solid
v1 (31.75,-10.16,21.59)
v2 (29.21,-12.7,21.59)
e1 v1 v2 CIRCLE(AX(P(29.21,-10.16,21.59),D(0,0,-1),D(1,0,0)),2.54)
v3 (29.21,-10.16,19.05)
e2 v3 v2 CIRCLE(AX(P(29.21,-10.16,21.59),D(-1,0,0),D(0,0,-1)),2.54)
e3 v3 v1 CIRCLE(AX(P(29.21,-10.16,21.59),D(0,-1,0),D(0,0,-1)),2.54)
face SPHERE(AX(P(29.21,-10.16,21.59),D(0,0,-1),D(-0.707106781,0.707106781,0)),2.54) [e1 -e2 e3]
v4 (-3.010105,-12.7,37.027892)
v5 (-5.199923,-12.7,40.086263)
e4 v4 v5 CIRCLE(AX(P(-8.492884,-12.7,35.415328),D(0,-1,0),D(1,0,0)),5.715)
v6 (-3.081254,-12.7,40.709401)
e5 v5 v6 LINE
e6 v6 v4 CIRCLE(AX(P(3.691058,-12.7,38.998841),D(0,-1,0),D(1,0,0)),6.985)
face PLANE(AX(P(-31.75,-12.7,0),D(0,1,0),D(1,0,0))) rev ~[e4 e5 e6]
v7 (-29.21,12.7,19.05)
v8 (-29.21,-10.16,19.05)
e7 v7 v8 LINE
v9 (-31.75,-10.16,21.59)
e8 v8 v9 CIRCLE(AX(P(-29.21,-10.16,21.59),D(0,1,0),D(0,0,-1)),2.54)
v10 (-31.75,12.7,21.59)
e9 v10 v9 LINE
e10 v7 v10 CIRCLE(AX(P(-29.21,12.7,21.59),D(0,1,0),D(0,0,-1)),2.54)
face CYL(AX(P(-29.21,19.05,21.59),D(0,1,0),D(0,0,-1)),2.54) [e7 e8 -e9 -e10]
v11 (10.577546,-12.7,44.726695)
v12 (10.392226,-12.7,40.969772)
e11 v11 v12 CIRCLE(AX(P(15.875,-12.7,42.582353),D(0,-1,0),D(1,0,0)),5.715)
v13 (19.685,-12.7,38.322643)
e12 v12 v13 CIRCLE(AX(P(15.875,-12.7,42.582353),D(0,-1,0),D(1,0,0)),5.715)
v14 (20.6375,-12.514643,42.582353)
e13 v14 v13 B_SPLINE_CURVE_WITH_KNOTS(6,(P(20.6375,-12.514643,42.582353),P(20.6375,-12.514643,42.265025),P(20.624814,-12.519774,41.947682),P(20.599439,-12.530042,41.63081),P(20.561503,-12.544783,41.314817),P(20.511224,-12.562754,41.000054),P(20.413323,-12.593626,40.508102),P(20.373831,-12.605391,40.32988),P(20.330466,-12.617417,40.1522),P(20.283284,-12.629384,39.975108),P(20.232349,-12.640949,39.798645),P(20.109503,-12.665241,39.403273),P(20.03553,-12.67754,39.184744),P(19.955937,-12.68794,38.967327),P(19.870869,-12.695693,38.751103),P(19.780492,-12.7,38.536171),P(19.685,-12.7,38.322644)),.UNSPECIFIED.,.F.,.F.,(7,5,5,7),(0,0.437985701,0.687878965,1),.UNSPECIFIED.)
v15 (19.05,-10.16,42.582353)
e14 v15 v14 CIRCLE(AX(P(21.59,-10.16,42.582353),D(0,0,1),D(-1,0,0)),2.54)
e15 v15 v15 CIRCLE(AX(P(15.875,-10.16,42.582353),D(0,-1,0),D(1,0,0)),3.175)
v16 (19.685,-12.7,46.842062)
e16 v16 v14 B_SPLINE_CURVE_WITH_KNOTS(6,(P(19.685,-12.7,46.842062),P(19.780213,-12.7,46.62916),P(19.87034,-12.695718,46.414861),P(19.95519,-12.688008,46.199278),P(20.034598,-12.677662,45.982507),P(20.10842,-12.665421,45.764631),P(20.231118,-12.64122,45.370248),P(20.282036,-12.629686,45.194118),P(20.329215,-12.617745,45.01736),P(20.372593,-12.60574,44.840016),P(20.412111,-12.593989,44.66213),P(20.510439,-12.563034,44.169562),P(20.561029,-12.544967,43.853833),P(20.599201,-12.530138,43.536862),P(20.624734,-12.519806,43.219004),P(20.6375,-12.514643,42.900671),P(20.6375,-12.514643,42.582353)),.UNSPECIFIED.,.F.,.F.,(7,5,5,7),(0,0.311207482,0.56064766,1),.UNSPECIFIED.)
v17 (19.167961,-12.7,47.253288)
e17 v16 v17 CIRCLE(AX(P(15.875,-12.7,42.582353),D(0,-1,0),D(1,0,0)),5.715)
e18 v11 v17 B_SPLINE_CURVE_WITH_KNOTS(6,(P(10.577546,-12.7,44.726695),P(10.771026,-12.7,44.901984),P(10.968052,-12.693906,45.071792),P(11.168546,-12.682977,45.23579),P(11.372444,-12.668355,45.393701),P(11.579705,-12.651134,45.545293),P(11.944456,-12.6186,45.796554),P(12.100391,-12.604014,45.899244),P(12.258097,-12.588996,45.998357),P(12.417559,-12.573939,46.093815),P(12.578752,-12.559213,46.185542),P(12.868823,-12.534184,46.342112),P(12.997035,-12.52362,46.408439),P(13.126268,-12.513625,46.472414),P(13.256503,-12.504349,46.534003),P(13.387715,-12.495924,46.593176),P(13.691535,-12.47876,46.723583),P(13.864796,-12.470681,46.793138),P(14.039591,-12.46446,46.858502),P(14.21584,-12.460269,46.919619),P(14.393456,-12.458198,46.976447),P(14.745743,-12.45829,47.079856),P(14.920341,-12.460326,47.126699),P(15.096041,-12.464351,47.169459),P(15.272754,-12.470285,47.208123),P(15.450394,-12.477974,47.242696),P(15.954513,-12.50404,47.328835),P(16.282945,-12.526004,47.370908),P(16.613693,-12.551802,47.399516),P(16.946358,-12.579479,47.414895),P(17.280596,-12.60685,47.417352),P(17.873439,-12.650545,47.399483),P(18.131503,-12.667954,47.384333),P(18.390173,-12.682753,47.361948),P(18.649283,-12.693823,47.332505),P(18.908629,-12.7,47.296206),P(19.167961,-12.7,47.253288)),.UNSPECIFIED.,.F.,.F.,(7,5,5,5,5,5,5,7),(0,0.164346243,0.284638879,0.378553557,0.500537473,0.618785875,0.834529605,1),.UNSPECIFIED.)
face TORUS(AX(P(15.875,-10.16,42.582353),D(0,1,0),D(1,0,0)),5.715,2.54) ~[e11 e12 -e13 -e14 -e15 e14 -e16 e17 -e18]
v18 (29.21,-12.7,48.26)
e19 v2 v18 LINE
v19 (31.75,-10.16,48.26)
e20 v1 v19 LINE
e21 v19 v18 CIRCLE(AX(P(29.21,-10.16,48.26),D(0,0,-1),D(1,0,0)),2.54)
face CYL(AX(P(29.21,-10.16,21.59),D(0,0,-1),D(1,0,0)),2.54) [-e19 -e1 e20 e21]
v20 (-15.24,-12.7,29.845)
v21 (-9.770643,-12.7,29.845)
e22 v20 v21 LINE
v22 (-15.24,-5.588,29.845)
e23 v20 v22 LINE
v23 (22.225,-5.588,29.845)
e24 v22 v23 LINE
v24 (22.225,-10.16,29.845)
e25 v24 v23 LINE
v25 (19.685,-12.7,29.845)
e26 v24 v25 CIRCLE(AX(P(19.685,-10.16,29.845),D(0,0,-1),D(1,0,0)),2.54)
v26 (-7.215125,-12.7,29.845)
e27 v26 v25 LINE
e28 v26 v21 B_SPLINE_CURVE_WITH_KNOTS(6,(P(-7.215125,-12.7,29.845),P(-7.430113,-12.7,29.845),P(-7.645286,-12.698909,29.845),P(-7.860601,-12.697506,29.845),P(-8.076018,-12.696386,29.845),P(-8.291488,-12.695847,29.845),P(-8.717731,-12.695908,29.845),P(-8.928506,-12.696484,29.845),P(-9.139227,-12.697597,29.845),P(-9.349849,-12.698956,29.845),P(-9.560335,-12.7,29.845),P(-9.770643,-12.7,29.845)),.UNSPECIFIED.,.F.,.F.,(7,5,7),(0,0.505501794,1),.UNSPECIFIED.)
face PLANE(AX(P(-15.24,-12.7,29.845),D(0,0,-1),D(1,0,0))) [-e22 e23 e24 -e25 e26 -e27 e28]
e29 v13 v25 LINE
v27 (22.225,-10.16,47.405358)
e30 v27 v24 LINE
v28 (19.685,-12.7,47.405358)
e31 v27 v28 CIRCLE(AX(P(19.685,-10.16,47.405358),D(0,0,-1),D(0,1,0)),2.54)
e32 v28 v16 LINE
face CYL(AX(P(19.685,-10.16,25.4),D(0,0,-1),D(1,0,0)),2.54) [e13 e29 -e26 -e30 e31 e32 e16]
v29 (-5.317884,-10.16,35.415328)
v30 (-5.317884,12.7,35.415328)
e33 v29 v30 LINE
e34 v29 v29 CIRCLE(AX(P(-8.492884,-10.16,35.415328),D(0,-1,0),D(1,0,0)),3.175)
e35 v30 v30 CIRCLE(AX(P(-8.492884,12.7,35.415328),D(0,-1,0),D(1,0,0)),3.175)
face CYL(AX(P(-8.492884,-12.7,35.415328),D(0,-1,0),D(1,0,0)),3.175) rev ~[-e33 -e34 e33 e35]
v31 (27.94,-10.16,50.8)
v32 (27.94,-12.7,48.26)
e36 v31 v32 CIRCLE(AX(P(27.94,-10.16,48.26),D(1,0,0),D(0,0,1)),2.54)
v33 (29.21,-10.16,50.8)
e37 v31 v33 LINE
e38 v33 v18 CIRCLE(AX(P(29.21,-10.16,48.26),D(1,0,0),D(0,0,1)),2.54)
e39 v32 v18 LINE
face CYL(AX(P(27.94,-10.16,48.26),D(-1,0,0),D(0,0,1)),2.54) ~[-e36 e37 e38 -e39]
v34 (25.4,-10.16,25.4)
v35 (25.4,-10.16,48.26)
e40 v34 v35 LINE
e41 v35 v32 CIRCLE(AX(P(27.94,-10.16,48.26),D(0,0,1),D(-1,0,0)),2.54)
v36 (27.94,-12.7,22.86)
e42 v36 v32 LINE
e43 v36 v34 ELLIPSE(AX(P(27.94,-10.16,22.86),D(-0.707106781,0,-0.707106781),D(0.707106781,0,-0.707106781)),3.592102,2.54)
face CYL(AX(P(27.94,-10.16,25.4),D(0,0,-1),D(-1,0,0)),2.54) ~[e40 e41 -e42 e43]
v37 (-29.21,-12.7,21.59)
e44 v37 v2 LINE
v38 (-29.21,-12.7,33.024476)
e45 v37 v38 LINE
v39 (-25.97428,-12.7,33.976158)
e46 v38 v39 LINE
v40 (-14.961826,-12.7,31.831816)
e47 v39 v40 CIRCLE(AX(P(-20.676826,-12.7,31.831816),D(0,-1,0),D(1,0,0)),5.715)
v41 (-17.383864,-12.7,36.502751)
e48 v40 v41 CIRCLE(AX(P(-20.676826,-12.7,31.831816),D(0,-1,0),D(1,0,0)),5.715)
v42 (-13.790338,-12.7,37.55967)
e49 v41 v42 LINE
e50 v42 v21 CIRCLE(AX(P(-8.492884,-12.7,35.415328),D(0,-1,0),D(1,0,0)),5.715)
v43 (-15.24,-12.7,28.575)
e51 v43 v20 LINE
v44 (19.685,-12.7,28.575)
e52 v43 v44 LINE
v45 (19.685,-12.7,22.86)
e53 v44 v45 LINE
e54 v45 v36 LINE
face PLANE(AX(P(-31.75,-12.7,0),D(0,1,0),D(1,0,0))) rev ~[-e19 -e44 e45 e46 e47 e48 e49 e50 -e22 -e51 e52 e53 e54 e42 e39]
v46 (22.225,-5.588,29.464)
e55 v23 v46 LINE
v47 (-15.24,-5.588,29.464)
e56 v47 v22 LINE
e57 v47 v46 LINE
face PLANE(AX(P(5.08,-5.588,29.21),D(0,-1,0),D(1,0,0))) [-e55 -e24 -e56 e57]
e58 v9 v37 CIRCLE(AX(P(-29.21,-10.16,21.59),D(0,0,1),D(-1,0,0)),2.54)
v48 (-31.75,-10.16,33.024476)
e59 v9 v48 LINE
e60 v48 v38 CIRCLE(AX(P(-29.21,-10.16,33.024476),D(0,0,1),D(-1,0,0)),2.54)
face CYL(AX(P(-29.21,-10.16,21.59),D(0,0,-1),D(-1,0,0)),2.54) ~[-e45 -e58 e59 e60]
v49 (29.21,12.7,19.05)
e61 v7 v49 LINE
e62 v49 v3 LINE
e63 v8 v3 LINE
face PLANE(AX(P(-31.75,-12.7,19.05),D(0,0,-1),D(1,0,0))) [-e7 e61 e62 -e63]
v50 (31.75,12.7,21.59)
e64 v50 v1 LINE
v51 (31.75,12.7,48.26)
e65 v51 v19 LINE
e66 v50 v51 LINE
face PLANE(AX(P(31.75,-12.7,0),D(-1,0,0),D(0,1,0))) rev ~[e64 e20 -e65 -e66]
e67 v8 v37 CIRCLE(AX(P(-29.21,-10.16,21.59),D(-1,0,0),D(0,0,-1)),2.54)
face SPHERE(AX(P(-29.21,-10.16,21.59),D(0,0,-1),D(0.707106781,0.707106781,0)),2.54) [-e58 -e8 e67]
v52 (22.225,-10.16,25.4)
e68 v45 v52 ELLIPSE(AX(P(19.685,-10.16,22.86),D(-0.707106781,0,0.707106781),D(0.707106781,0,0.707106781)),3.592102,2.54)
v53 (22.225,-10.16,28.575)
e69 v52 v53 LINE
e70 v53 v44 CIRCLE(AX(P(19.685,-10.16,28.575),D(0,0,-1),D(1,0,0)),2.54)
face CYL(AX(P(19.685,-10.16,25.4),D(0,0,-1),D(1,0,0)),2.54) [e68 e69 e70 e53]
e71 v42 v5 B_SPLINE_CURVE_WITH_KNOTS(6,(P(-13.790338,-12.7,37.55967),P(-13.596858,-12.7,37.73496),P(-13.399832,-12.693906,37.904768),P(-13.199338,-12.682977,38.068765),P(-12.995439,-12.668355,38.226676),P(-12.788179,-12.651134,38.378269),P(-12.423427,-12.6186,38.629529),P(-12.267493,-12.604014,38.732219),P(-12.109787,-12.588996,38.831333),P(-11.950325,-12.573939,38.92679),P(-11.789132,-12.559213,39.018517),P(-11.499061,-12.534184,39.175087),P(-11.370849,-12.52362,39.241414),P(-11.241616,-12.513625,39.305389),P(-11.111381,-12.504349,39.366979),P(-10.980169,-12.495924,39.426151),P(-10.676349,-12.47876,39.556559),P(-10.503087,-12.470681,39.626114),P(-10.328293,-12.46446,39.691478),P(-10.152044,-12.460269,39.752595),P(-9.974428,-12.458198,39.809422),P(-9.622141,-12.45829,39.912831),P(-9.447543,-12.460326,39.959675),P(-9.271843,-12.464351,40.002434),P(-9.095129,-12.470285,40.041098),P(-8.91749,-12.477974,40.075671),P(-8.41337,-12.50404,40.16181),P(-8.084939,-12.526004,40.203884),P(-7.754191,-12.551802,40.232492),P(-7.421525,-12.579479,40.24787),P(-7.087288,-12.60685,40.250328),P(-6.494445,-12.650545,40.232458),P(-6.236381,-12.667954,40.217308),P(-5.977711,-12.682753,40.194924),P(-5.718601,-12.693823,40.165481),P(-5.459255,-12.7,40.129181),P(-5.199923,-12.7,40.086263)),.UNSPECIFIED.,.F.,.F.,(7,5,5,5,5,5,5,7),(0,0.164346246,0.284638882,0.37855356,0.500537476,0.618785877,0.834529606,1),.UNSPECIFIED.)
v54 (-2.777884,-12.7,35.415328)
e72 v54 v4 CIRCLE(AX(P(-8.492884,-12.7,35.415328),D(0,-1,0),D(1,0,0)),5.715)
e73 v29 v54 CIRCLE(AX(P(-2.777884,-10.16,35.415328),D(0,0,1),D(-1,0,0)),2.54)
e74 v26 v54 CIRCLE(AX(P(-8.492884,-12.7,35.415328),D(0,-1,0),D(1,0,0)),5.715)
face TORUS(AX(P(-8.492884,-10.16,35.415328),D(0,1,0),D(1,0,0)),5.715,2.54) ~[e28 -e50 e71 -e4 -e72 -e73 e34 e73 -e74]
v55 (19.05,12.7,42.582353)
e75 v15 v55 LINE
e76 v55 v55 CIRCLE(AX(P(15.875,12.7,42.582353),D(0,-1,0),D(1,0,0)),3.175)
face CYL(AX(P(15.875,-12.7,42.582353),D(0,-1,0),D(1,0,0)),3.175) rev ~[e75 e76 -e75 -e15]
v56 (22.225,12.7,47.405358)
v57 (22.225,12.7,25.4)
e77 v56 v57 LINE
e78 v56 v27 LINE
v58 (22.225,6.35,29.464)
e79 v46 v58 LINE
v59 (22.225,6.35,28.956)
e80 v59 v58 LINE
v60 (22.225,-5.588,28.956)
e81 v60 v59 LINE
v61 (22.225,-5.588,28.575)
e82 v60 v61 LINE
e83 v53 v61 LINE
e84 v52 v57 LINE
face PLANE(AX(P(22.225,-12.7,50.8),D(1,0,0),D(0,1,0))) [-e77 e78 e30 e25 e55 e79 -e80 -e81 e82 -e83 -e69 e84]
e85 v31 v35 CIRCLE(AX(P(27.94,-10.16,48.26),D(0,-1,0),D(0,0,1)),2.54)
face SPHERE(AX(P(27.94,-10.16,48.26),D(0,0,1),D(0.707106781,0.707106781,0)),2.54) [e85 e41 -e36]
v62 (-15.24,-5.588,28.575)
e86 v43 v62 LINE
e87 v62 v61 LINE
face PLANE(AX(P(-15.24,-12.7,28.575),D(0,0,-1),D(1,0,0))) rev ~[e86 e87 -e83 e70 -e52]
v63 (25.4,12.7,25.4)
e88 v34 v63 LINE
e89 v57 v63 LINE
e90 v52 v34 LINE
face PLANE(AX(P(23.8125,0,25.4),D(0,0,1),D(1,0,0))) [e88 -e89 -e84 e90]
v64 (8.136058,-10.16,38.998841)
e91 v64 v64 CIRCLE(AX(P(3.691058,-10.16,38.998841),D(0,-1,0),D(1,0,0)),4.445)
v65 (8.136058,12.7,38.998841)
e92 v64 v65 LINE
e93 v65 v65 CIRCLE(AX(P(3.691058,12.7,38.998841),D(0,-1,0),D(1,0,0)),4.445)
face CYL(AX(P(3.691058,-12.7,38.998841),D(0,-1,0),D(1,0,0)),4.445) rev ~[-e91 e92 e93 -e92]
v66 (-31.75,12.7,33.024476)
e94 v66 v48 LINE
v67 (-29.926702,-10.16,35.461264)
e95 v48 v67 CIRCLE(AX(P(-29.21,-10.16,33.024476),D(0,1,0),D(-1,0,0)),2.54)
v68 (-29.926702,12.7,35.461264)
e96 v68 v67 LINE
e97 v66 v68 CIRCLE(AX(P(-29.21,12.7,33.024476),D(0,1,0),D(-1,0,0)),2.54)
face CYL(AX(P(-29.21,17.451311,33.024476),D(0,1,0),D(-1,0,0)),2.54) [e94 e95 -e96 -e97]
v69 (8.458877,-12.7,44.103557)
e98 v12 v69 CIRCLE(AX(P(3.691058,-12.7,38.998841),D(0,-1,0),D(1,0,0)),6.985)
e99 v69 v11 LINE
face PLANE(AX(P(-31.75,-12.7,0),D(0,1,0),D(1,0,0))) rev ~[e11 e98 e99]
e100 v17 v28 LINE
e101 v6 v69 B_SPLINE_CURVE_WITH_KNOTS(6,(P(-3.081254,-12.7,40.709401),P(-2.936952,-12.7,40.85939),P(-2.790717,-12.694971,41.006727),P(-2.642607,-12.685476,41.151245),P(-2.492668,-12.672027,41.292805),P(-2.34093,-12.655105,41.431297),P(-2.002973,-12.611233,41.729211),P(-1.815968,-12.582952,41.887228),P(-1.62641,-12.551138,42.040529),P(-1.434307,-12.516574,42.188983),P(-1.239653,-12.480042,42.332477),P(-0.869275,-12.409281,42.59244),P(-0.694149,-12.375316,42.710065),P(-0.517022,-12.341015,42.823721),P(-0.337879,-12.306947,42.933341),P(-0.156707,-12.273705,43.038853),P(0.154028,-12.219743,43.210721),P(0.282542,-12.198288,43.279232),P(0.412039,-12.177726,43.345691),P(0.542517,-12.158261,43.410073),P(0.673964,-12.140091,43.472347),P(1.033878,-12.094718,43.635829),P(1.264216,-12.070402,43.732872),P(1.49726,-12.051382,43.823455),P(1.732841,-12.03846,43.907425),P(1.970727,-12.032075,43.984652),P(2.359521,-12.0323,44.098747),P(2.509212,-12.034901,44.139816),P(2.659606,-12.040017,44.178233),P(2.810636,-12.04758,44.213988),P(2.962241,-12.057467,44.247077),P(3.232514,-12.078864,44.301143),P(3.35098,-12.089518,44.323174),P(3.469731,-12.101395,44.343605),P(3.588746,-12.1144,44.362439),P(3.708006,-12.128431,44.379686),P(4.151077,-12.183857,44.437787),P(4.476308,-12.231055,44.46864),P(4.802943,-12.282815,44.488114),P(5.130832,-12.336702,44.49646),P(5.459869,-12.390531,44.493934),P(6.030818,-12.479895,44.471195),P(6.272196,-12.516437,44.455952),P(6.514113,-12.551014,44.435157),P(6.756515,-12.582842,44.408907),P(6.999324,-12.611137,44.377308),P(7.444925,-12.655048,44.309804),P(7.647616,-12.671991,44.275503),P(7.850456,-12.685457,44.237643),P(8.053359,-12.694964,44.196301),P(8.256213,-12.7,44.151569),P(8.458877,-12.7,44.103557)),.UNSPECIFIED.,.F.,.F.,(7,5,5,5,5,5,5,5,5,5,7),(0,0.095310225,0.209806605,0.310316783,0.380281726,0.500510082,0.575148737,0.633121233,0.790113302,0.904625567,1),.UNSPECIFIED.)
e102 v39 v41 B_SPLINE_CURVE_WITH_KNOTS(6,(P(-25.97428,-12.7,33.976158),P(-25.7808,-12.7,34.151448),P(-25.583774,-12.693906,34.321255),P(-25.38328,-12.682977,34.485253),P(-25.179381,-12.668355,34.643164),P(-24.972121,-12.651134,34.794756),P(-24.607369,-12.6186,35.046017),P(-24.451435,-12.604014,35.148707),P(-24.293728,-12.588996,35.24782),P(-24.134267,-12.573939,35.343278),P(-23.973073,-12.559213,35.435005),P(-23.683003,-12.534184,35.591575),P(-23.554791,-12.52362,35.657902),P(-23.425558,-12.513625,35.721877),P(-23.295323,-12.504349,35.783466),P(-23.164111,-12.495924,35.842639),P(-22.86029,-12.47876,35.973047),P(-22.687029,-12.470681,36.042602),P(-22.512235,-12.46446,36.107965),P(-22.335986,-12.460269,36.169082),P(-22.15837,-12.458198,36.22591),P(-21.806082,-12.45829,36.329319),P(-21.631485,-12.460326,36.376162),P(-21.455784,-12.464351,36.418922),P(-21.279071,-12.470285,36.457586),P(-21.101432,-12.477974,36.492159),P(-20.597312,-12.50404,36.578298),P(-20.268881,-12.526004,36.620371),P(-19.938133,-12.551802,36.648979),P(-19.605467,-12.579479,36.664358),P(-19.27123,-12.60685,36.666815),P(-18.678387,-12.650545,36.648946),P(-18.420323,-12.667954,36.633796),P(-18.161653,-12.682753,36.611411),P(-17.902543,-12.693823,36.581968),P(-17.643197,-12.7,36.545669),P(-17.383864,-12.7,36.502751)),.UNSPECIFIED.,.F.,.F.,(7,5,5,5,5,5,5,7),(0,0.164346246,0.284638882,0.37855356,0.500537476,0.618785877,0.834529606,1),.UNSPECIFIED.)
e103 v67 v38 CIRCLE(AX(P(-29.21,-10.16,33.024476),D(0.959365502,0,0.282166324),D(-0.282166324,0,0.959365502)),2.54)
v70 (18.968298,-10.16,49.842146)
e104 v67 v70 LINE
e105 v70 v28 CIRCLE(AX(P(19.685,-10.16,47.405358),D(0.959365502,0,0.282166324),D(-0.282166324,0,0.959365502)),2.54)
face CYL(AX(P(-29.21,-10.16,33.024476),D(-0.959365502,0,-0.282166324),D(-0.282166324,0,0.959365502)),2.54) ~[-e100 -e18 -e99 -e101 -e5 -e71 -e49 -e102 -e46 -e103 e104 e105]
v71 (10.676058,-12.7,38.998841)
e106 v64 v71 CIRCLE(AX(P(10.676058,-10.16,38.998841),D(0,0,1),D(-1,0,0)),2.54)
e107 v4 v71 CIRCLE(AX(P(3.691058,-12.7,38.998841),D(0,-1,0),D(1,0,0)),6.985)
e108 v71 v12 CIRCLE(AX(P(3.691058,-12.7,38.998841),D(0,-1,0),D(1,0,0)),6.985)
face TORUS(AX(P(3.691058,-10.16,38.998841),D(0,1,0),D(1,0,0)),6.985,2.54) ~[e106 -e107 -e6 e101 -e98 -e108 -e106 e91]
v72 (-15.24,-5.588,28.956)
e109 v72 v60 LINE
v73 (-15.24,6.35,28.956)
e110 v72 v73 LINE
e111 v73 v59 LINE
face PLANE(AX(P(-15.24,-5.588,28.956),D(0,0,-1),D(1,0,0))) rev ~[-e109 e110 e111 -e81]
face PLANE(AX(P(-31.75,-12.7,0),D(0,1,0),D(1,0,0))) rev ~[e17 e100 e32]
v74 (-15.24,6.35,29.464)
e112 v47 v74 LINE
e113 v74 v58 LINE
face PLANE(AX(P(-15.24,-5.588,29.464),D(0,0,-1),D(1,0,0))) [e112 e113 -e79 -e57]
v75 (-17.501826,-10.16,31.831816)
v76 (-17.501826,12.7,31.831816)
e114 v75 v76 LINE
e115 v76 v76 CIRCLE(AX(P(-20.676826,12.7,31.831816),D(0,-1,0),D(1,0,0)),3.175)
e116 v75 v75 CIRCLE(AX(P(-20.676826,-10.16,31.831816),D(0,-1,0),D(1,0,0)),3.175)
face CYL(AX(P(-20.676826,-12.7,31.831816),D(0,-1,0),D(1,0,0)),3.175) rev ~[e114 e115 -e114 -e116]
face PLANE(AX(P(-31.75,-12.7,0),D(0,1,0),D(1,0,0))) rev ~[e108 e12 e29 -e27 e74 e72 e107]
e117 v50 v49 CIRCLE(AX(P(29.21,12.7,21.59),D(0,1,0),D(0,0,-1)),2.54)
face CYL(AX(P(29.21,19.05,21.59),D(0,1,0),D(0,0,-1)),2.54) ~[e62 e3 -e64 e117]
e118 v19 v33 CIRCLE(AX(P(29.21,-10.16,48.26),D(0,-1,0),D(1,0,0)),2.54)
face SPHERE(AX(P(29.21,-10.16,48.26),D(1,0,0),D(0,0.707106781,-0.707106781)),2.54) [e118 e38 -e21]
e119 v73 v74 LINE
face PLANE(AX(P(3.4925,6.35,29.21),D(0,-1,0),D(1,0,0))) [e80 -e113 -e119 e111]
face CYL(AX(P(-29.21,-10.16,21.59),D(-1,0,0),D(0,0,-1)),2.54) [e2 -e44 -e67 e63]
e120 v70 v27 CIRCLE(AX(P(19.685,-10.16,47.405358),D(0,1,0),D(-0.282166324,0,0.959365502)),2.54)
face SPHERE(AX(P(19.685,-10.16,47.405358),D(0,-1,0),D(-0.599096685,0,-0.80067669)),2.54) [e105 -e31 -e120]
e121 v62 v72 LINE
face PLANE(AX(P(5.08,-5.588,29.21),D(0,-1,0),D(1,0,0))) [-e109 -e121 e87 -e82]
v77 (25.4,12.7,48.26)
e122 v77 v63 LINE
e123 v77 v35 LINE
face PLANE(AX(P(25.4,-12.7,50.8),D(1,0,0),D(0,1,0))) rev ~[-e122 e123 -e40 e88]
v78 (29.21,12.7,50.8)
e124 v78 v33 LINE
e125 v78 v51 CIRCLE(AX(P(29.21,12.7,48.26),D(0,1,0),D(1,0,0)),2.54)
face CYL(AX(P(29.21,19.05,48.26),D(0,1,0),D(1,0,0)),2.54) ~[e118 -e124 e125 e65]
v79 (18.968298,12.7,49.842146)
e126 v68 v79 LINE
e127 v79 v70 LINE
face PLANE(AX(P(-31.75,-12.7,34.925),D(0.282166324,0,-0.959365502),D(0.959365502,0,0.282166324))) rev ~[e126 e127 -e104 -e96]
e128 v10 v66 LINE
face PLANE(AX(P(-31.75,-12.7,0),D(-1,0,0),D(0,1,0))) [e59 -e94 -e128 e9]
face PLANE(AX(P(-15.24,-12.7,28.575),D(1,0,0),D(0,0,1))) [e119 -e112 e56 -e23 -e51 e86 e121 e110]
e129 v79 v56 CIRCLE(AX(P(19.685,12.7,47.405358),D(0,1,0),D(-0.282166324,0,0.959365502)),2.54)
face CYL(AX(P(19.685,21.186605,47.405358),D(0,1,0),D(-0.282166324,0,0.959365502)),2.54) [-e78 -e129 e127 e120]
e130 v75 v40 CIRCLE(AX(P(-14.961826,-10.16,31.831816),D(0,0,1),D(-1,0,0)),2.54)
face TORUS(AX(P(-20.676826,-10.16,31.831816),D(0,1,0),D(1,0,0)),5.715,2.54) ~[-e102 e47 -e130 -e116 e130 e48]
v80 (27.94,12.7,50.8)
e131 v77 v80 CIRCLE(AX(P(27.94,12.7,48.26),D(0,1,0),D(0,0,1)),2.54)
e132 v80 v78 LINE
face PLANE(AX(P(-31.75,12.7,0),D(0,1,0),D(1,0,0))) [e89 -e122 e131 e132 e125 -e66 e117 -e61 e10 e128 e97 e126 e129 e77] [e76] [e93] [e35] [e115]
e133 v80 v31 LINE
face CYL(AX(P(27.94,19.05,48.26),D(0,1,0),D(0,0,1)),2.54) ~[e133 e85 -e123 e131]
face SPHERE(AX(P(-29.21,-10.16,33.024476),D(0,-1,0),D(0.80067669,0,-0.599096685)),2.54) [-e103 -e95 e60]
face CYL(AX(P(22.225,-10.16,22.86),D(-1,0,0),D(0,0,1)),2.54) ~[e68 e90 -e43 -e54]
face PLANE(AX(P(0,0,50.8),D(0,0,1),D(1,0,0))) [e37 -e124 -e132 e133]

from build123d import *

# Parameters (mm, degrees)
F0_W          = 63.5
F0_H          = 25.4
F1_DEPTH      = 50.8
F2_W          = 3.175
F2_H          = 25.4
F3_DEPTH      = 25.4
F4_W          = 40.64
F4_H          = 1.27
F5_DEPTH      = 7.112
F6_W          = 63.5
F6_H          = 19.05
F7_DEPTH      = 25.4
F9_DEPTH      = 25.4
F10_W         = 37.465
F10_H         = 0.508
F11_DEPTH     = 11.938
F12_R         = 3.175
F12_R_2       = 4.445
F13_DEPTH     = 25.4
F14_T1_DEPTH  = 27.6113109813
F14_T3_DEPTH  = 31.3466050989
F14_T5_DEPTH  = 29.21
F14_T7_DEPTH  = 26.67
F14_T9_DEPTH  = 22.86
F14_T11_DEPTH = 9.525
F14_T13_DEPTH = 50.9659769086
F14_T15_DEPTH = 3.175
F14_T17_DEPTH = 58.42
F14_T19_DEPTH = 11.4344756075
F14_T21_DEPTH = 1.27
F14_T26_DEPTH = 2.54
F14_T32_DEPTH = 2.54
F14_S37_W     = 2.54
F14_S37_H     = 2.54
F14_T38_DEPTH = 2.54
F14_S43_W     = 2.54
F14_S43_H     = 2.54
F14_T44_DEPTH = 2.54
F14_S49_W     = 2.54
F14_S49_H     = 2.54
F14_T50_DEPTH = 2.54
F14_S55_W     = 2.54
F14_S55_H     = 2.54
F14_T56_DEPTH = 2.54
F14_T62_DEPTH = 23.9103579604
F14_T76_DEPTH = 29.21
F14_T80_DEPTH = 9.525
F14_T87_DEPTH = 15.875
F14_T91_DEPTH = 9.525


# Not quite as in the source:
# - a fillet or chamfer that OpenCascade refuses, or shapes differently, is made with other operations: its cross-section is extruded or revolved along the edge and cut away or added


with BuildPart() as f1:
    # F0 (on Top) → F1 (new body)
    with BuildSketch(Plane.XY):
        Rectangle(F0_W, F0_H)
    extrude(amount=F1_DEPTH)

    # F2 (on face) → F3 (cut)
    with BuildSketch(Plane.XY.offset(50.8)):
        with Locations((23.8125, 0)):
            Rectangle(F2_W, F2_H)
    extrude(amount=-F3_DEPTH, mode=Mode.SUBTRACT)

    # F4 (on face) → F5 (cut)
    with BuildSketch(Plane.XZ.offset(12.7)):
        with Locations((5.08, 29.21)):
            Rectangle(F4_W, F4_H)
    extrude(amount=-F5_DEPTH, mode=Mode.SUBTRACT)

    # F6 (on face) → F7 (cut)
    with BuildSketch(Plane.XZ.offset(12.7)):
        with Locations((0, 9.525)):
            Rectangle(F6_W, F6_H)
    extrude(amount=-F7_DEPTH, mode=Mode.SUBTRACT)

    # F8 (on face) → F9 (cut)
    with BuildSketch(Plane.XZ.offset(12.7)):
        Polygon((-31.75, 50.8), (-31.75, 34.925), (22.225, 50.8), align=None)
    extrude(amount=-F9_DEPTH, mode=Mode.SUBTRACT)

    # F10 (on face) → F11 (cut)
    with BuildSketch(Plane.XZ.offset(5.588)):
        with Locations((3.4925, 29.21)):
            Rectangle(F10_W, F10_H)
    extrude(amount=-F11_DEPTH, mode=Mode.SUBTRACT)

    # F12 (on face) → F13 (cut)
    with BuildSketch(Plane.XZ.offset(12.7)):
        with Locations((15.875, 42.5823529412)):
            Circle(F12_R)
        with Locations((3.69105813, 38.9988406265)):
            Circle(F12_R_2)
        with Locations((-8.4928837399, 35.4153283118)):
            Circle(F12_R)
        with Locations((-20.6768256099, 31.8318159971)):
            Circle(F12_R)
    extrude(amount=-F13_DEPTH, mode=Mode.SUBTRACT)

    # F14: fillet of radius 2.54 on 19 edges, made by hand

    # F14_s2 → F14_t1 (cut)
    with BuildSketch(Plane.XZ.offset(-17.4513109813)):
        with BuildLine():
            ThreePointArc((-31.75, 33.0244756075), (-31.2437187927, 34.5461811875), (-29.9267024629, 35.4612639815))
            Line((-29.9267024629, 35.4612639815), (-31.75, 34.925))
            Line((-31.75, 34.925), (-31.75, 33.0244756075))
        make_face()
    extrude(amount=F14_T1_DEPTH, mode=Mode.SUBTRACT)

    # F14_s4 → F14_t3 (cut)
    with BuildSketch(Plane.XZ.offset(-21.1866050989)):
        with BuildLine():
            ThreePointArc((18.9682975371, 49.8421463344), (21.20670558, 49.4390767532), (22.225, 47.4053579604))
            Line((22.225, 47.4053579604), (22.225, 50.8))
            Line((22.225, 50.8), (18.9682975371, 49.8421463344))
        make_face()
    extrude(amount=F14_T3_DEPTH, mode=Mode.SUBTRACT)

    # F14_s6 → F14_t5 (cut)
    with BuildSketch(Plane.XZ.offset(-19.05)):
        with BuildLine():
            ThreePointArc((27.94, 50.8), (26.1439487758, 50.0560512242), (25.4, 48.26))
            Line((25.4, 48.26), (25.4, 50.8))
            Line((25.4, 50.8), (27.94, 50.8))
        make_face()
        with BuildLine():
            ThreePointArc((31.75, 48.26), (31.0060512242, 50.0560512242), (29.21, 50.8))
            Line((29.21, 50.8), (31.75, 50.8))
            Line((31.75, 50.8), (31.75, 48.26))
        make_face()
        with BuildLine():
            ThreePointArc((-29.21, 19.05), (-31.0060512242, 19.7939487758), (-31.75, 21.59))
            Line((-31.75, 21.59), (-31.75, 19.05))
            Line((-31.75, 19.05), (-29.21, 19.05))
        make_face()
        with BuildLine():
            ThreePointArc((29.21, 19.05), (31.0060512242, 19.7939487758), (31.75, 21.59))
            Line((31.75, 21.59), (31.75, 19.05))
            Line((31.75, 19.05), (29.21, 19.05))
        make_face()
    extrude(amount=F14_T5_DEPTH, mode=Mode.SUBTRACT)

    # F14_s8 → F14_t7 (cut)
    with BuildSketch(Plane.XY.offset(21.59)):
        with BuildLine():
            ThreePointArc((31.75, -10.16), (31.0060512242, -11.9560512242), (29.21, -12.7))
            Line((29.21, -12.7), (31.75, -12.7))
            Line((31.75, -12.7), (31.75, -10.16))
        make_face()
    extrude(amount=F14_T7_DEPTH, mode=Mode.SUBTRACT)

    # F14_s10 → F14_t9 (cut)
    with BuildSketch(Plane.XY.offset(25.4)):
        with BuildLine():
            ThreePointArc((25.4, -10.16), (26.1439487758, -11.9560512242), (27.94, -12.7))
            Line((27.94, -12.7), (25.4, -12.7))
            Line((25.4, -12.7), (25.4, -10.16))
        make_face()
    extrude(amount=F14_T9_DEPTH, mode=Mode.SUBTRACT)

    # F14_s12 → F14_t11 (cut)
    with BuildSketch(Plane.XY.offset(25.4)):
        with BuildLine():
            ThreePointArc((22.225, -10.16), (21.4810512242, -11.9560512242), (19.685, -12.7))
            Line((19.685, -12.7), (22.225, -12.7))
            Line((22.225, -12.7), (22.225, -10.16))
        make_face()
    extrude(amount=F14_T11_DEPTH, mode=Mode.SUBTRACT)

    # F14_s14 → F14_t13 (cut)
    with BuildSketch(Plane(origin=(-17.9446164757, 0, -5.2778283752), x_dir=(0, 1, 0), z_dir=(0.9593655016, 0, 0.282166324))):
        with BuildLine():
            ThreePointArc((-10.16, 42.4646209291), (-11.9560512242, 41.7206721533), (-12.7, 39.9246209291))
            Line((-12.7, 39.9246209291), (-12.7, 42.4646209291))
            Line((-12.7, 42.4646209291), (-10.16, 42.4646209291))
        make_face()
    extrude(amount=F14_T13_DEPTH, mode=Mode.SUBTRACT)

    # F14_s16 → F14_t15 (cut)
    with BuildSketch(Plane.YZ.offset(22.225)):
        with BuildLine():
            ThreePointArc((-10.16, 25.4), (-11.9560512242, 24.6560512242), (-12.7, 22.86))
            Line((-12.7, 22.86), (-12.7, 25.4))
            Line((-12.7, 25.4), (-10.16, 25.4))
        make_face()
    extrude(amount=F14_T15_DEPTH, mode=Mode.SUBTRACT)

    # F14_s18 → F14_t17 (cut)
    with BuildSketch(Plane.YZ.offset(-29.21)):
        with BuildLine():
            ThreePointArc((-10.16, 19.05), (-11.9560512242, 19.7939487758), (-12.7, 21.59))
            Line((-12.7, 21.59), (-12.7, 19.05))
            Line((-12.7, 19.05), (-10.16, 19.05))
        make_face()
    extrude(amount=F14_T17_DEPTH, mode=Mode.SUBTRACT)

    # F14_s20 → F14_t19 (cut)
    with BuildSketch(Plane.XY.offset(21.59)):
        with BuildLine():
            ThreePointArc((-31.75, -10.16), (-31.0060512242, -11.9560512242), (-29.21, -12.7))
            Line((-29.21, -12.7), (-31.75, -12.7))
            Line((-31.75, -12.7), (-31.75, -10.16))
        make_face()
    extrude(amount=F14_T19_DEPTH, mode=Mode.SUBTRACT)

    # F14_s22 → F14_t21 (cut)
    with BuildSketch(Plane.YZ.offset(27.94)):
        with BuildLine():
            ThreePointArc((-10.16, 50.8), (-11.9560512242, 50.0560512242), (-12.7, 48.26))
            Line((-12.7, 48.26), (-12.7, 50.8))
            Line((-12.7, 50.8), (-10.16, 50.8))
        make_face()
    extrude(amount=F14_T21_DEPTH, mode=Mode.SUBTRACT)


with BuildPart() as f14_tool24:
    # F14_s25 → F14_t26 (new body)
    with BuildSketch(Plane.XZ.offset(10.16)):
        Polygon((-29.21, 33.0244756075), (-31.75, 33.0244756075), (-31.75, 34.925), (-29.9267024629, 35.4612639815), align=None)
    extrude(amount=F14_T26_DEPTH)

    # F14_s27 → F14_t28 (revolve, cut)
    with BuildSketch(Plane(origin=(-29.21, -10.16, 33.0244756075), x_dir=(0.8006766901, 0, -0.599096685), z_dir=(-0.599096685, 0, -0.8006766901))):
        with BuildLine():
            ThreePointArc((0, -2.54), (2.54, 0), (0, 2.54))
            Line((0, 2.54), (0, -2.54))
        make_face()
    revolve(axis=Axis((-29.21, -10.16, 33.0244756075), (0, -1, 0)), mode=Mode.SUBTRACT)


with BuildPart() as f1_1:
    add(f1.part)

    # F14_t23: cut F14_tool24
    add(f14_tool24.part, mode=Mode.SUBTRACT)


with BuildPart() as f14_tool30:
    # F14_s31 → F14_t32 (new body)
    with BuildSketch(Plane.XZ.offset(10.16)):
        Polygon((19.685, 47.4053579604), (18.9682975371, 49.8421463344), (22.225, 50.8), (22.225, 47.4053579604), align=None)
    extrude(amount=F14_T32_DEPTH)

    # F14_s33 → F14_t34 (revolve, cut)
    with BuildSketch(Plane(origin=(19.685, -10.16, 47.4053579604), x_dir=(-0.599096685, 0, -0.8006766901), z_dir=(-0.8006766901, 0, 0.599096685))):
        with BuildLine():
            ThreePointArc((0, -2.54), (2.54, 0), (0, 2.54))
            Line((0, 2.54), (0, -2.54))
        make_face()
    revolve(axis=Axis((19.685, -10.16, 47.4053579604), (0, -1, 0)), mode=Mode.SUBTRACT)


with BuildPart() as f1_2:
    add(f1_1.part)

    # F14_t29: cut F14_tool30
    add(f14_tool30.part, mode=Mode.SUBTRACT)


with BuildPart() as f14_tool36:
    # F14_s37 → F14_t38 (new body)
    with BuildSketch(Plane.XY.offset(48.26)):
        with Locations((26.67, -11.43)):
            Rectangle(F14_S37_W, F14_S37_H)
    extrude(amount=F14_T38_DEPTH)

    # F14_s39 → F14_t40 (revolve, cut)
    with BuildSketch(Plane(origin=(27.94, -10.16, 48.26), x_dir=(0.7071067812, 0.7071067812, 0), z_dir=(0.7071067812, -0.7071067812, 0))):
        with BuildLine():
            ThreePointArc((0, -2.54), (2.54, 0), (0, 2.54))
            Line((0, 2.54), (0, -2.54))
        make_face()
    revolve(axis=Axis((27.94, -10.16, 48.26), (0, 0, 1)), mode=Mode.SUBTRACT)


with BuildPart() as f1_3:
    add(f1_2.part)

    # F14_t35: cut F14_tool36
    add(f14_tool36.part, mode=Mode.SUBTRACT)


with BuildPart() as f14_tool42:
    # F14_s43 → F14_t44 (new body)
    with BuildSketch(Plane.XY.offset(21.59)):
        with Locations((30.48, -11.43)):
            Rectangle(F14_S43_W, F14_S43_H)
    extrude(amount=-F14_T44_DEPTH)

    # F14_s45 → F14_t46 (revolve, cut)
    with BuildSketch(Plane(origin=(29.21, -10.16, 21.59), x_dir=(-0.7071067812, 0.7071067812, 0), z_dir=(-0.7071067812, -0.7071067812, 0))):
        with BuildLine():
            ThreePointArc((0, -2.54), (2.54, 0), (0, 2.54))
            Line((0, 2.54), (0, -2.54))
        make_face()
    revolve(axis=Axis((29.21, -10.16, 21.59), (0, 0, -1)), mode=Mode.SUBTRACT)


with BuildPart() as f1_4:
    add(f1_3.part)

    # F14_t41: cut F14_tool42
    add(f14_tool42.part, mode=Mode.SUBTRACT)


with BuildPart() as f14_tool48:
    # F14_s49 → F14_t50 (new body)
    with BuildSketch(Plane.YZ.offset(29.21)):
        with Locations((-11.43, 49.53)):
            Rectangle(F14_S49_W, F14_S49_H)
    extrude(amount=F14_T50_DEPTH)

    # F14_s51 → F14_t52 (revolve, cut)
    with BuildSketch(Plane(origin=(29.21, -10.16, 48.26), x_dir=(0, 0.7071067812, -0.7071067812), z_dir=(0, -0.7071067812, -0.7071067812))):
        with BuildLine():
            ThreePointArc((0, -2.54), (2.54, 0), (0, 2.54))
            Line((0, 2.54), (0, -2.54))
        make_face()
    revolve(axis=Axis((29.21, -10.16, 48.26), (1, 0, 0)), mode=Mode.SUBTRACT)


with BuildPart() as f1_5:
    add(f1_4.part)

    # F14_t47: cut F14_tool48
    add(f14_tool48.part, mode=Mode.SUBTRACT)


with BuildPart() as f14_tool54:
    # F14_s55 → F14_t56 (new body)
    with BuildSketch(Plane.XY.offset(21.59)):
        with Locations((-30.48, -11.43)):
            Rectangle(F14_S55_W, F14_S55_H)
    extrude(amount=-F14_T56_DEPTH)

    # F14_s57 → F14_t58 (revolve, cut)
    with BuildSketch(Plane(origin=(-29.21, -10.16, 21.59), x_dir=(0.7071067812, 0.7071067812, 0), z_dir=(-0.7071067812, 0.7071067812, 0))):
        with BuildLine():
            ThreePointArc((0, -2.54), (2.54, 0), (0, 2.54))
            Line((0, 2.54), (0, -2.54))
        make_face()
    revolve(axis=Axis((-29.21, -10.16, 21.59), (0, 0, -1)), mode=Mode.SUBTRACT)


with BuildPart() as f1_6:
    add(f1_5.part)

    # F14_t53: cut F14_tool54
    add(f14_tool54.part, mode=Mode.SUBTRACT)


with BuildPart() as f14_tool60:
    # F14_s61 → F14_t62 (new body)
    with BuildSketch(Plane.XY.offset(47.4053579604)):
        with BuildLine():
            ThreePointArc((22.225, -10.16), (21.4810512242, -11.9560512242), (19.685, -12.7))
            Line((19.685, -12.7), (22.225, -12.7))
            Line((22.225, -12.7), (22.225, -10.16))
        make_face()
    extrude(amount=-F14_T62_DEPTH)

    split(bisect_by=Plane.XY.offset(25.4), keep=Keep.TOP)


with BuildPart() as f1_7:
    add(f1_6.part)

    # F14_t59: cut F14_tool60
    add(f14_tool60.part, mode=Mode.SUBTRACT)

    # F14_s64 → F14_t65 (revolve, cut)
    with BuildSketch(Plane.XY.offset(31.8318159971)):
        with BuildLine():
            ThreePointArc((-17.5018256099, -10.16), (-16.7578768341, -11.9560512242), (-14.9618256099, -12.7))
            Line((-14.9618256099, -12.7), (-17.5018256099, -12.7))
            Line((-17.5018256099, -12.7), (-17.5018256099, -10.16))
        make_face()
    revolve(axis=Axis((-20.6768256099, -12.7, 31.8318159971), (0, -1, 0)), mode=Mode.SUBTRACT)

    # F14_s66 → F14_t67 (revolve, cut)
    with BuildSketch(Plane.XY.offset(35.4153283118)):
        with BuildLine():
            ThreePointArc((-5.3178837399, -10.16), (-4.5739349641, -11.9560512242), (-2.7778837399, -12.7))
            Line((-2.7778837399, -12.7), (-5.3178837399, -12.7))
            Line((-5.3178837399, -12.7), (-5.3178837399, -10.16))
        make_face()
    revolve(axis=Axis((-8.4928837399, -12.7, 35.4153283118), (0, -1, 0)), mode=Mode.SUBTRACT)

    # F14_s68 → F14_t69 (revolve, cut)
    with BuildSketch(Plane.XY.offset(38.9988406265)):
        with BuildLine():
            ThreePointArc((8.13605813, -10.16), (8.8800069058, -11.9560512242), (10.67605813, -12.7))
            Line((10.67605813, -12.7), (8.13605813, -12.7))
            Line((8.13605813, -12.7), (8.13605813, -10.16))
        make_face()
    revolve(axis=Axis((3.69105813, -12.7, 38.9988406265), (0, -1, 0)), mode=Mode.SUBTRACT)

    # F14_s70 → F14_t71 (revolve, cut)
    with BuildSketch(Plane.XY.offset(42.5823529412)):
        with BuildLine():
            ThreePointArc((19.05, -10.16), (19.7939487758, -11.9560512242), (21.59, -12.7))
            Line((21.59, -12.7), (19.05, -12.7))
            Line((19.05, -12.7), (19.05, -10.16))
        make_face()
    revolve(axis=Axis((15.875, -12.7, 42.5823529412), (0, -1, 0)), mode=Mode.SUBTRACT)


with BuildPart() as f14_tool74:
    # F14_s75 → F14_t76 (new body)
    with BuildSketch(Plane.XY.offset(19.05)):
        with BuildLine():
            ThreePointArc((25.4, -10.16), (26.1439487758, -11.9560512242), (27.94, -12.7))
            Line((27.94, -12.7), (25.4, -12.7))
            Line((25.4, -12.7), (25.4, -10.16))
        make_face()
    extrude(amount=F14_T76_DEPTH)

    split(bisect_by=Plane.XY.offset(25.4), keep=Keep.BOTTOM)


with BuildPart() as f14_tool78:
    # F14_s79 → F14_t80 (new body)
    with BuildSketch(Plane.YZ.offset(22.225)):
        with BuildLine():
            ThreePointArc((-10.16, 25.4), (-11.9560512242, 24.6560512242), (-12.7, 22.86))
            Line((-12.7, 22.86), (-12.7, 25.4))
            Line((-12.7, 25.4), (-10.16, 25.4))
        make_face()
    extrude(amount=F14_T80_DEPTH)

    split(bisect_by=Plane.YZ.offset(25.4), keep=Keep.TOP)


with BuildPart() as f14_tool74_1:
    add(f14_tool74.part)

    # F14_t82: intersect F14_tool78
    add(f14_tool78.part, mode=Mode.INTERSECT)


with BuildPart() as f1_8:
    add(f1_7.part)

    # F14_t72: cut F14_tool74
    add(f14_tool74_1.part, mode=Mode.SUBTRACT)


with BuildPart() as f14_tool85:
    # F14_s86 → F14_t87 (new body)
    with BuildSketch(Plane.XY.offset(34.925)):
        with BuildLine():
            ThreePointArc((22.225, -10.16), (21.4810512242, -11.9560512242), (19.685, -12.7))
            Line((19.685, -12.7), (22.225, -12.7))
            Line((22.225, -12.7), (22.225, -10.16))
        make_face()
    extrude(amount=-F14_T87_DEPTH)

    split(bisect_by=Plane.XY.offset(25.4), keep=Keep.BOTTOM)


with BuildPart() as f14_tool89:
    # F14_s90 → F14_t91 (new body)
    with BuildSketch(Plane.YZ.offset(15.875)):
        with BuildLine():
            ThreePointArc((-10.16, 25.4), (-11.9560512242, 24.6560512242), (-12.7, 22.86))
            Line((-12.7, 22.86), (-12.7, 25.4))
            Line((-12.7, 25.4), (-10.16, 25.4))
        make_face()
    extrude(amount=F14_T91_DEPTH)

    split(bisect_by=Plane.YZ.offset(22.225), keep=Keep.BOTTOM)


with BuildPart() as f14_tool85_1:
    add(f14_tool85.part)

    # F14_t93: intersect F14_tool89
    add(f14_tool89.part, mode=Mode.INTERSECT)


with BuildPart() as f1_9:
    add(f1_8.part)

    # F14_t83: cut F14_tool85
    add(f14_tool85_1.part, mode=Mode.SUBTRACT)


solid = f1_9.part
